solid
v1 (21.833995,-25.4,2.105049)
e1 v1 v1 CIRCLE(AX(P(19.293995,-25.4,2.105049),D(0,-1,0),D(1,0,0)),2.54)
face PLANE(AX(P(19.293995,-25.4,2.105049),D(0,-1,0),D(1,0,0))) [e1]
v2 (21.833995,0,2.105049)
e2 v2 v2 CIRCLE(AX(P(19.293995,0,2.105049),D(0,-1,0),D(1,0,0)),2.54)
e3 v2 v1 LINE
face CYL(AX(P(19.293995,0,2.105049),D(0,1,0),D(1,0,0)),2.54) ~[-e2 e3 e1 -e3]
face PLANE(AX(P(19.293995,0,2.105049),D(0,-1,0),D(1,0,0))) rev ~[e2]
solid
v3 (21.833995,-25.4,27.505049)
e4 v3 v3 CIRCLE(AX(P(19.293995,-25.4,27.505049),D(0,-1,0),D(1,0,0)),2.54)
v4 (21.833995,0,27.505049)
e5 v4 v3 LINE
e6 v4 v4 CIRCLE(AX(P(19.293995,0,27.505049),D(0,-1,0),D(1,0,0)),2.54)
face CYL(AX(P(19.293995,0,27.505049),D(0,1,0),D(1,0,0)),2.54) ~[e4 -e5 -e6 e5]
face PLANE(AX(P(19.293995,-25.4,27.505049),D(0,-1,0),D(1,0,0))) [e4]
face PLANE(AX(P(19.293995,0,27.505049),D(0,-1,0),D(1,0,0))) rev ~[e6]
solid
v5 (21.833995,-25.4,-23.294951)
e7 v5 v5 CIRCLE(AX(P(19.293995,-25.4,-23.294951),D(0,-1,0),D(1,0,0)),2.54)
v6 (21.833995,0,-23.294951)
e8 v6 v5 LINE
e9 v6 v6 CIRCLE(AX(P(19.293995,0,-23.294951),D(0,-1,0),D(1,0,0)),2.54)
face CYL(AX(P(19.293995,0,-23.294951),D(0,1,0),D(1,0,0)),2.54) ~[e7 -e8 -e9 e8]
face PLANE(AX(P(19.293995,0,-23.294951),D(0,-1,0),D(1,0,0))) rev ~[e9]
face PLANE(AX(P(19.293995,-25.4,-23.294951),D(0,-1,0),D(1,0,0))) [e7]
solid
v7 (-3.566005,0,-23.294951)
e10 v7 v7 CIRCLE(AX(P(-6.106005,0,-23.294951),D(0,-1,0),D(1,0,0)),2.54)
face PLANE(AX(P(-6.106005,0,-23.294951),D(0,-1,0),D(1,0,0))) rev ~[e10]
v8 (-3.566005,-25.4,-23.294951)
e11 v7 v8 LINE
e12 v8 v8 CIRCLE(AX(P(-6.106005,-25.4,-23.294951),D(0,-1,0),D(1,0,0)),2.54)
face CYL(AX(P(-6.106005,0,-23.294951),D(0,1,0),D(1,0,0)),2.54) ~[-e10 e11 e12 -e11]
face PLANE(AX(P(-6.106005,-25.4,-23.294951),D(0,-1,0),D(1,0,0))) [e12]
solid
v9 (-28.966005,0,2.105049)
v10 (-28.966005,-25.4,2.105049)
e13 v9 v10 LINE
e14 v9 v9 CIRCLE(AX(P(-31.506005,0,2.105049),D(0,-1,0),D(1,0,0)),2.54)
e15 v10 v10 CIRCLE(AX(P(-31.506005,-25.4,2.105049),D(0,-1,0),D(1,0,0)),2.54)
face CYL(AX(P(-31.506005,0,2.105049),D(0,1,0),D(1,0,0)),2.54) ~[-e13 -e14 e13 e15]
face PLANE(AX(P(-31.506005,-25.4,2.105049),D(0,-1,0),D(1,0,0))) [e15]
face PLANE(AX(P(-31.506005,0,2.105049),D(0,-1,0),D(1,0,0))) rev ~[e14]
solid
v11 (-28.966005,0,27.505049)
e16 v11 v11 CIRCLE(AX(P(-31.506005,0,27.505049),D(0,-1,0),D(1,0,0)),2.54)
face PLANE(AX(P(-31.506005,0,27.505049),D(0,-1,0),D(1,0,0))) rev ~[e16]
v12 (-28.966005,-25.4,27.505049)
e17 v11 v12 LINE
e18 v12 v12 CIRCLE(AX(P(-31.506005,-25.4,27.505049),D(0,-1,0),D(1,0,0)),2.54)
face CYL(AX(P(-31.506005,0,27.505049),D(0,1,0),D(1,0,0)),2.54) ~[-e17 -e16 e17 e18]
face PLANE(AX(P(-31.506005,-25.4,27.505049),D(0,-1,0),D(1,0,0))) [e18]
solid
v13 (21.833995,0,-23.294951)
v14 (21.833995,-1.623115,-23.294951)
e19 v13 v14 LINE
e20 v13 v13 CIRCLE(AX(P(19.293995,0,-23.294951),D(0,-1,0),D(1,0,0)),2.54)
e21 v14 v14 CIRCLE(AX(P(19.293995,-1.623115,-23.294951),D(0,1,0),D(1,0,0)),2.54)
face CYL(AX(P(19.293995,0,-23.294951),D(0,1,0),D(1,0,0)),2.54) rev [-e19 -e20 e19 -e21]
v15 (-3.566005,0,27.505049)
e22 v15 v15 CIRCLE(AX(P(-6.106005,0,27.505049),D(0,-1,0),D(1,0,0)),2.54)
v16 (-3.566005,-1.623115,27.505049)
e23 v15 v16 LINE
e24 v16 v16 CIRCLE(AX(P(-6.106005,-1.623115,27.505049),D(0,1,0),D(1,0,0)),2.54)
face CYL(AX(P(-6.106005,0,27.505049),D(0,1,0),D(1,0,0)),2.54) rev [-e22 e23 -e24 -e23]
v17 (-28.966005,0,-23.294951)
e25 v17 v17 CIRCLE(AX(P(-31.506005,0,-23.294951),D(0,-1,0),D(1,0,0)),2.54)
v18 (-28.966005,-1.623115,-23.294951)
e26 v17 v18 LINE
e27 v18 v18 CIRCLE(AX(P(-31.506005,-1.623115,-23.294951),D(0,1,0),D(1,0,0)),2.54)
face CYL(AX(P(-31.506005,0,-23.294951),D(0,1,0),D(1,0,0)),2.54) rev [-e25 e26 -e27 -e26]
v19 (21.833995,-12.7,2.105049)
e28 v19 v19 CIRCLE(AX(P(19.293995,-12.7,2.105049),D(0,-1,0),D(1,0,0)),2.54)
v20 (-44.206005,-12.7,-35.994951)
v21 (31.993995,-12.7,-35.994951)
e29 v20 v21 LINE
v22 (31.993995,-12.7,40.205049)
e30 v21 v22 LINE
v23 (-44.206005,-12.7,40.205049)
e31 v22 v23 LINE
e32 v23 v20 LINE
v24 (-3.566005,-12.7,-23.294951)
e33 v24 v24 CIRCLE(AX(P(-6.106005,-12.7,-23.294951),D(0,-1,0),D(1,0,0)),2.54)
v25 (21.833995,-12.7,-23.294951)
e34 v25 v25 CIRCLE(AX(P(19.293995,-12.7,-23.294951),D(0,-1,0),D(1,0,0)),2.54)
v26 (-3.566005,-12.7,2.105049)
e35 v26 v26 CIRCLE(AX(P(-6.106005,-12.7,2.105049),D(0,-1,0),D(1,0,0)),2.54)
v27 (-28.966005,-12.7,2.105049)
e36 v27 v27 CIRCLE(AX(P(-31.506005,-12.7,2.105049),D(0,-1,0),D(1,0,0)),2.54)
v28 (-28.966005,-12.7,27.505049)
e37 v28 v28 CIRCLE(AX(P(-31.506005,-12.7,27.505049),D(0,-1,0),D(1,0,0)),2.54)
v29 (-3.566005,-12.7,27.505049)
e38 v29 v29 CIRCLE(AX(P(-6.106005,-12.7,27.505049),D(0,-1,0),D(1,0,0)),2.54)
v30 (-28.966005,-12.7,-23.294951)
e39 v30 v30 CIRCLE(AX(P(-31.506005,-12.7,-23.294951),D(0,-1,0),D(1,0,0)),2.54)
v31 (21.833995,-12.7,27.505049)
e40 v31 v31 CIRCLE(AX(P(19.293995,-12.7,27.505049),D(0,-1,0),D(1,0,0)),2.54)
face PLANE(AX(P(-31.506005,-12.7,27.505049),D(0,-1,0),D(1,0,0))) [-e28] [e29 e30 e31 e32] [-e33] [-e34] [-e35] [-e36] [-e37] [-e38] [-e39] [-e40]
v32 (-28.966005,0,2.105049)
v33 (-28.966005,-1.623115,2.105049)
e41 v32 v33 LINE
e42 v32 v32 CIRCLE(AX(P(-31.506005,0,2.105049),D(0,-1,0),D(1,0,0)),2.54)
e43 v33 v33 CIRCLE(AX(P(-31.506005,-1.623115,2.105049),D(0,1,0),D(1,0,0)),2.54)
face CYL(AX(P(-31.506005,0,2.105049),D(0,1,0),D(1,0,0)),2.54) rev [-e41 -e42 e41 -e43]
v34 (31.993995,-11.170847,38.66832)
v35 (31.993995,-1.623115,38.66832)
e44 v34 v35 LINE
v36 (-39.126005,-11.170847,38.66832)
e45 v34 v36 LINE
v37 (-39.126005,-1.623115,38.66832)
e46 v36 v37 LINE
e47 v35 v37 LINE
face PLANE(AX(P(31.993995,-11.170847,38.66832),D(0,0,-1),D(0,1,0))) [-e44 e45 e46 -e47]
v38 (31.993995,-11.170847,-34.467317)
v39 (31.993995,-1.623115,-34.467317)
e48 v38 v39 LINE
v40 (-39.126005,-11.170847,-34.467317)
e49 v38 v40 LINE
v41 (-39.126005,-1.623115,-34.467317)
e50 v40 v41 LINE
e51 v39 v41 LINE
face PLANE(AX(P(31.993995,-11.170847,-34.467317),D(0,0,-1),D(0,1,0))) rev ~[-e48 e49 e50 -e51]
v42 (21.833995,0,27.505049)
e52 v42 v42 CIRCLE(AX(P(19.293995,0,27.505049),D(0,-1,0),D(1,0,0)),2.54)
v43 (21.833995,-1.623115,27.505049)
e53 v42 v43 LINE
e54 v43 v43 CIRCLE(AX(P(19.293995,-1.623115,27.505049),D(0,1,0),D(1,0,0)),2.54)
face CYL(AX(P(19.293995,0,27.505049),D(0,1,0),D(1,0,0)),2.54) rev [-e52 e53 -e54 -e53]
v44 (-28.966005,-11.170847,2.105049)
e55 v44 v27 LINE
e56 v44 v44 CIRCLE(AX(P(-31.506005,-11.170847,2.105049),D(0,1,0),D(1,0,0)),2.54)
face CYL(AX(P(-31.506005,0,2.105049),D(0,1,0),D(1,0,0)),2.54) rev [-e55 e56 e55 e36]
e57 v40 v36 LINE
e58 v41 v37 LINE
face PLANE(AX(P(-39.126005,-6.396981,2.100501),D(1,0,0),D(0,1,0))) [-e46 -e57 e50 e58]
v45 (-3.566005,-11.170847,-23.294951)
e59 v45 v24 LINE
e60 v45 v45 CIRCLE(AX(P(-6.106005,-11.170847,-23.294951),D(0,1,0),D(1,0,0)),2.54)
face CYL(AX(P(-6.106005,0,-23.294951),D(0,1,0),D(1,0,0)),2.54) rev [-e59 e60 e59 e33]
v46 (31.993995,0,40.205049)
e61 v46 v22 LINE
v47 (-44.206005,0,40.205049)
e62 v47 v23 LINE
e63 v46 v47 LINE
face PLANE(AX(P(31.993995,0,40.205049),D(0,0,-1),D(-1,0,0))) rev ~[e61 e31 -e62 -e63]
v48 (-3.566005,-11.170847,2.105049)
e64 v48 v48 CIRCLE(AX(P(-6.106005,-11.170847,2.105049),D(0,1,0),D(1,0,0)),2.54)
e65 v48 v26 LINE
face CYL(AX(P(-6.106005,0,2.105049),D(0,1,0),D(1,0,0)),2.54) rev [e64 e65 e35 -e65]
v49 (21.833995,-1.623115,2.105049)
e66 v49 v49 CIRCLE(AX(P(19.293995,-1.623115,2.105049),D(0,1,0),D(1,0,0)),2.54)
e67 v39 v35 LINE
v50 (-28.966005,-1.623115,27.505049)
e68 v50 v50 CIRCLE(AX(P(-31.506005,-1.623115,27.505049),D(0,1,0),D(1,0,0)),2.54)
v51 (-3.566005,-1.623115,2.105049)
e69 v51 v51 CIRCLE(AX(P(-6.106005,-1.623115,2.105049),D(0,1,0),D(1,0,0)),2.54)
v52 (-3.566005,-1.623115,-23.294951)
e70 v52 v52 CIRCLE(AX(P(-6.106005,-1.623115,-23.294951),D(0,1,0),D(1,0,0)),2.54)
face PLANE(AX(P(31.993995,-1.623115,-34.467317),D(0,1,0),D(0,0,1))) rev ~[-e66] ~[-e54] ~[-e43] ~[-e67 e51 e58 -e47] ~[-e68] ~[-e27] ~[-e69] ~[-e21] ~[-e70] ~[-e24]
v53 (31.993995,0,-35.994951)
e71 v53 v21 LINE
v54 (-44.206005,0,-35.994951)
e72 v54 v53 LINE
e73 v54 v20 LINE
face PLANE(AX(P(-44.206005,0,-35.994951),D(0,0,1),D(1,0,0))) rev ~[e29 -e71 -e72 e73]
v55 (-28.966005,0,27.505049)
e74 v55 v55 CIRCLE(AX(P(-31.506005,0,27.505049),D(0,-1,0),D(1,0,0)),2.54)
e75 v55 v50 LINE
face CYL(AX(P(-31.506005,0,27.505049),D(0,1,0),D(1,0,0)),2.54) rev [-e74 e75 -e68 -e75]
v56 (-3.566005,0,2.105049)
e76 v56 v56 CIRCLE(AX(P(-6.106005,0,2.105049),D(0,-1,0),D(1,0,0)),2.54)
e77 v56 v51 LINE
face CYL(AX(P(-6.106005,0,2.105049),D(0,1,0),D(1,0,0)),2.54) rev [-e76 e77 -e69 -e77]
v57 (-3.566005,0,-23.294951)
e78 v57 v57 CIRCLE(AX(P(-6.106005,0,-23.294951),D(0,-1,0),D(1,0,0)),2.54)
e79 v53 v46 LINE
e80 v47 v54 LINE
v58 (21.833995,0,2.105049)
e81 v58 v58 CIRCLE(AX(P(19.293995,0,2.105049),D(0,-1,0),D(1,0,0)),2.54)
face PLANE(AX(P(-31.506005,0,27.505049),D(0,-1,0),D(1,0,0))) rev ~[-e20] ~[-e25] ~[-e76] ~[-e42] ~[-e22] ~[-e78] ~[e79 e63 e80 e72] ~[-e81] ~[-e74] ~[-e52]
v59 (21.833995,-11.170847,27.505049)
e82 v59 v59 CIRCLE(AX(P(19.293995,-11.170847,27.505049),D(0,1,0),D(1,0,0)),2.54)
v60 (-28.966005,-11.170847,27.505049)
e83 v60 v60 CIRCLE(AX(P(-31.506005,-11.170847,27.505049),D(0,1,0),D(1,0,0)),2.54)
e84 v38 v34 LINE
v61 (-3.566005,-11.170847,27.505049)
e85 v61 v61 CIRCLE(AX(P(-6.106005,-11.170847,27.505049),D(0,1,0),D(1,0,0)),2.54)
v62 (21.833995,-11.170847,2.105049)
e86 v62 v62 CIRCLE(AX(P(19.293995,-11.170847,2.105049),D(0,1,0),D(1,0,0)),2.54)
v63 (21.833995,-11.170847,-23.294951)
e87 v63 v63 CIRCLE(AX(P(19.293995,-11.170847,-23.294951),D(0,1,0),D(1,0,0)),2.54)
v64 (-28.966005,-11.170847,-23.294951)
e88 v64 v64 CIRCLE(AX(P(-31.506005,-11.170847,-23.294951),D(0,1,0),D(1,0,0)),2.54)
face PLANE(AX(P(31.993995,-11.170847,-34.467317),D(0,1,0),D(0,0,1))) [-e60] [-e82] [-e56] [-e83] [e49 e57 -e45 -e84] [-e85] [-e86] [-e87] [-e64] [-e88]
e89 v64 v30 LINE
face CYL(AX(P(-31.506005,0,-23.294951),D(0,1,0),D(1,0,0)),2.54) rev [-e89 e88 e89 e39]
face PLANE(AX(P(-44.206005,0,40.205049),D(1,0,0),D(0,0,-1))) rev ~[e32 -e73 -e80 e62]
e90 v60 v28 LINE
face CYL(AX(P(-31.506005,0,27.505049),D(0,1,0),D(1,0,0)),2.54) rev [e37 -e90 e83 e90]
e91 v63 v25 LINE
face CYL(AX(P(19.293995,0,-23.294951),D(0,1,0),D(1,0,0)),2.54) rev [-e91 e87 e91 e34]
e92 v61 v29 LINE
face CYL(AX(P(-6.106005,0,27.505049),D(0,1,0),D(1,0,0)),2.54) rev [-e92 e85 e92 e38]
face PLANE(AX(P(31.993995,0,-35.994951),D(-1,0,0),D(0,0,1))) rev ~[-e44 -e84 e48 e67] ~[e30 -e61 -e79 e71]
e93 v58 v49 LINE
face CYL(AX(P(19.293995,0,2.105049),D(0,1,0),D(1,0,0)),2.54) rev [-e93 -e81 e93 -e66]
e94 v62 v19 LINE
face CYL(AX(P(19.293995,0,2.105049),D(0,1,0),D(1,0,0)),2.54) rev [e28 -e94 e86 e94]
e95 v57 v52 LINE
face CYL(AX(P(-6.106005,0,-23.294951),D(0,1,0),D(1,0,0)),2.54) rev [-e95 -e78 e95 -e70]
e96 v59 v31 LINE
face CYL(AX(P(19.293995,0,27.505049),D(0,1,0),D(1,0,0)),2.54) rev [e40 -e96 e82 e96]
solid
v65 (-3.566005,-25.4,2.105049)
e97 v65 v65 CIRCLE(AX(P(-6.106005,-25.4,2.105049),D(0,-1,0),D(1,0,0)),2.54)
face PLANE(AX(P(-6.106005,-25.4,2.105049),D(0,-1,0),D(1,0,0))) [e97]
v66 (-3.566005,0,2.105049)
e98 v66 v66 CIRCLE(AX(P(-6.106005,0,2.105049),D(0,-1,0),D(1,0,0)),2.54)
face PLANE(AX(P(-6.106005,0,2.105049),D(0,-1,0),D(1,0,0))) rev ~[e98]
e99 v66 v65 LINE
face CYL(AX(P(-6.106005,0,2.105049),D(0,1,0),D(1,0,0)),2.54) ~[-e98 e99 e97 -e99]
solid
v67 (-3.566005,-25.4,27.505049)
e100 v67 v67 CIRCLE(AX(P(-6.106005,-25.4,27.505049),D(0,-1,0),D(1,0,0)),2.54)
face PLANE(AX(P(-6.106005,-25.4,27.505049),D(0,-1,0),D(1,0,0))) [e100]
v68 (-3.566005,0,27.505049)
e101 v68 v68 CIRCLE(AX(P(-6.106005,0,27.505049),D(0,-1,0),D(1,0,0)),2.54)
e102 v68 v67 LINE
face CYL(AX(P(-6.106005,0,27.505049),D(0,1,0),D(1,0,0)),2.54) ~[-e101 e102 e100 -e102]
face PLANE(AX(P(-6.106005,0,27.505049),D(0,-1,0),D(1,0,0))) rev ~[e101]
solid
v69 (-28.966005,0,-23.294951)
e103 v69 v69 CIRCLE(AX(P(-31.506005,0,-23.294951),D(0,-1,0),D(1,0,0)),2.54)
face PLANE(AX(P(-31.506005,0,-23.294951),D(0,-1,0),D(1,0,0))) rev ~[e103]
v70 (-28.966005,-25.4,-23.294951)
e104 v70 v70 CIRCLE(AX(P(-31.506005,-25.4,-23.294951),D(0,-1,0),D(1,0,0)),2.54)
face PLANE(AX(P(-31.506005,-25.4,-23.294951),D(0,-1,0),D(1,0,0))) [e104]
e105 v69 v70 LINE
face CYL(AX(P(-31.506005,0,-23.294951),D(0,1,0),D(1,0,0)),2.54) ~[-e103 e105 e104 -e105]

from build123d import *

# Parameters (mm, degrees)
F0_R     = 2.54
F1_DEPTH = 25.4
F0_W     = 25.4
F0_H     = 25.4
F2_DEPTH = 12.7
F3_W     = 9.5477323048
F3_H     = 73.1356367469
F4_DEPTH = 71.12


with BuildPart() as f1:
    # F0 (on Front) → F1 (new body)
    with BuildSketch(Plane.XZ):
        with Locations((-31.5060045898, 27.5050493181)):
            Circle(F0_R)
    extrude(amount=F1_DEPTH)


with BuildPart() as f1b:
    # F0 (on Front) → F1, piece 2 (new body)
    with BuildSketch(Plane.XZ):
        with Locations((-6.1060045898, 27.5050493181)):
            Circle(F0_R)
    extrude(amount=F1_DEPTH)


with BuildPart() as f1c:
    # F0 (on Front) → F1, piece 3 (new body)
    with BuildSketch(Plane.XZ):
        with Locations((19.2939954102, 27.5050493181)):
            Circle(F0_R)
    extrude(amount=F1_DEPTH)


with BuildPart() as f1d:
    # F0 (on Front) → F1, piece 4 (new body)
    with BuildSketch(Plane.XZ):
        with Locations((-31.5060045898, 2.1050493181)):
            Circle(F0_R)
    extrude(amount=F1_DEPTH)


with BuildPart() as f1e:
    # F0 (on Front) → F1, piece 5 (new body)
    with BuildSketch(Plane.XZ):
        with Locations((-6.1060045898, 2.1050493181)):
            Circle(F0_R)
    extrude(amount=F1_DEPTH)


with BuildPart() as f1f:
    # F0 (on Front) → F1, piece 6 (new body)
    with BuildSketch(Plane.XZ):
        with Locations((19.2939954102, 2.1050493181)):
            Circle(F0_R)
    extrude(amount=F1_DEPTH)


with BuildPart() as f1g:
    # F0 (on Front) → F1, piece 7 (new body)
    with BuildSketch(Plane.XZ):
        with Locations((-31.5060045898, -23.2949506819)):
            Circle(F0_R)
    extrude(amount=F1_DEPTH)


with BuildPart() as f1h:
    # F0 (on Front) → F1, piece 8 (new body)
    with BuildSketch(Plane.XZ):
        with Locations((-6.1060045898, -23.2949506819)):
            Circle(F0_R)
    extrude(amount=F1_DEPTH)


with BuildPart() as f1i:
    # F0 (on Front) → F1, piece 9 (new body)
    with BuildSketch(Plane.XZ):
        with Locations((19.2939954102, -23.2949506819)):
            Circle(F0_R)
    extrude(amount=F1_DEPTH)


with BuildPart() as f2:
    # F0 (on Front) → F2 (new body)
    with BuildSketch(Plane.XZ):
        Polygon((-18.8060045898, 40.2050493181), (-44.2060045898, 40.2050493181), (-44.2060045898, 14.8050493181), (-40.7688207924, 14.8050493181), (-18.8060045898, 14.8050493181), align=None)
        with Locations((-31.5060045898, 27.5050493181)):
            Circle(F0_R, mode=Mode.SUBTRACT)
        Polygon((-40.7688207924, 14.8050493181), (-44.2060045898, 14.8050493181), (-44.2060045898, -10.5949506819), (-18.8060045898, -10.5949506819), (-18.8060045898, 14.8050493181), align=None)
        with Locations((-31.5060045898, 2.1050493181)):
            Circle(F0_R, mode=Mode.SUBTRACT)
        with Locations((-6.1060045898, 27.5050493181)):
            Rectangle(F0_W, F0_H)
        with Locations((-6.1060045898, 27.5050493181)):
            Circle(F0_R, mode=Mode.SUBTRACT)
        with Locations((-31.5060045898, -23.2949506819)):
            Rectangle(F0_W, F0_H)
        with Locations((-31.5060045898, -23.2949506819)):
            Circle(F0_R, mode=Mode.SUBTRACT)
        with Locations((19.2939954102, 27.5050493181)):
            Rectangle(F0_W, F0_H)
        with Locations((19.2939954102, 27.5050493181)):
            Circle(F0_R, mode=Mode.SUBTRACT)
        with Locations((-6.1060045898, -23.2949506819)):
            Rectangle(F0_W, F0_H)
        with Locations((-6.1060045898, -23.2949506819)):
            Circle(F0_R, mode=Mode.SUBTRACT)
        with Locations((19.2939954102, 2.1050493181)):
            Rectangle(F0_W, F0_H)
        with Locations((19.2939954102, 2.1050493181)):
            Circle(F0_R, mode=Mode.SUBTRACT)
        with Locations((19.2939954102, -23.2949506819)):
            Rectangle(F0_W, F0_H)
        with Locations((19.2939954102, -23.2949506819)):
            Circle(F0_R, mode=Mode.SUBTRACT)
        with Locations((-6.1060045898, 2.1050493181)):
            Rectangle(F0_W, F0_H)
        with Locations((-6.1060045898, 2.1050493181)):
            Circle(F0_R, mode=Mode.SUBTRACT)
    extrude(amount=F2_DEPTH)

    # F3 (on face) → F4 (cut)
    with BuildSketch(Plane.YZ.offset(31.9939954102)):
        with Locations((-6.396981189, 2.1005012095)):
            Rectangle(F3_W, F3_H)
    extrude(amount=-F4_DEPTH, mode=Mode.SUBTRACT)


solid = Compound([f1.part, f1b.part, f1c.part, f1d.part, f1e.part, f1f.part, f1g.part, f1h.part, f1i.part, f2.part])
